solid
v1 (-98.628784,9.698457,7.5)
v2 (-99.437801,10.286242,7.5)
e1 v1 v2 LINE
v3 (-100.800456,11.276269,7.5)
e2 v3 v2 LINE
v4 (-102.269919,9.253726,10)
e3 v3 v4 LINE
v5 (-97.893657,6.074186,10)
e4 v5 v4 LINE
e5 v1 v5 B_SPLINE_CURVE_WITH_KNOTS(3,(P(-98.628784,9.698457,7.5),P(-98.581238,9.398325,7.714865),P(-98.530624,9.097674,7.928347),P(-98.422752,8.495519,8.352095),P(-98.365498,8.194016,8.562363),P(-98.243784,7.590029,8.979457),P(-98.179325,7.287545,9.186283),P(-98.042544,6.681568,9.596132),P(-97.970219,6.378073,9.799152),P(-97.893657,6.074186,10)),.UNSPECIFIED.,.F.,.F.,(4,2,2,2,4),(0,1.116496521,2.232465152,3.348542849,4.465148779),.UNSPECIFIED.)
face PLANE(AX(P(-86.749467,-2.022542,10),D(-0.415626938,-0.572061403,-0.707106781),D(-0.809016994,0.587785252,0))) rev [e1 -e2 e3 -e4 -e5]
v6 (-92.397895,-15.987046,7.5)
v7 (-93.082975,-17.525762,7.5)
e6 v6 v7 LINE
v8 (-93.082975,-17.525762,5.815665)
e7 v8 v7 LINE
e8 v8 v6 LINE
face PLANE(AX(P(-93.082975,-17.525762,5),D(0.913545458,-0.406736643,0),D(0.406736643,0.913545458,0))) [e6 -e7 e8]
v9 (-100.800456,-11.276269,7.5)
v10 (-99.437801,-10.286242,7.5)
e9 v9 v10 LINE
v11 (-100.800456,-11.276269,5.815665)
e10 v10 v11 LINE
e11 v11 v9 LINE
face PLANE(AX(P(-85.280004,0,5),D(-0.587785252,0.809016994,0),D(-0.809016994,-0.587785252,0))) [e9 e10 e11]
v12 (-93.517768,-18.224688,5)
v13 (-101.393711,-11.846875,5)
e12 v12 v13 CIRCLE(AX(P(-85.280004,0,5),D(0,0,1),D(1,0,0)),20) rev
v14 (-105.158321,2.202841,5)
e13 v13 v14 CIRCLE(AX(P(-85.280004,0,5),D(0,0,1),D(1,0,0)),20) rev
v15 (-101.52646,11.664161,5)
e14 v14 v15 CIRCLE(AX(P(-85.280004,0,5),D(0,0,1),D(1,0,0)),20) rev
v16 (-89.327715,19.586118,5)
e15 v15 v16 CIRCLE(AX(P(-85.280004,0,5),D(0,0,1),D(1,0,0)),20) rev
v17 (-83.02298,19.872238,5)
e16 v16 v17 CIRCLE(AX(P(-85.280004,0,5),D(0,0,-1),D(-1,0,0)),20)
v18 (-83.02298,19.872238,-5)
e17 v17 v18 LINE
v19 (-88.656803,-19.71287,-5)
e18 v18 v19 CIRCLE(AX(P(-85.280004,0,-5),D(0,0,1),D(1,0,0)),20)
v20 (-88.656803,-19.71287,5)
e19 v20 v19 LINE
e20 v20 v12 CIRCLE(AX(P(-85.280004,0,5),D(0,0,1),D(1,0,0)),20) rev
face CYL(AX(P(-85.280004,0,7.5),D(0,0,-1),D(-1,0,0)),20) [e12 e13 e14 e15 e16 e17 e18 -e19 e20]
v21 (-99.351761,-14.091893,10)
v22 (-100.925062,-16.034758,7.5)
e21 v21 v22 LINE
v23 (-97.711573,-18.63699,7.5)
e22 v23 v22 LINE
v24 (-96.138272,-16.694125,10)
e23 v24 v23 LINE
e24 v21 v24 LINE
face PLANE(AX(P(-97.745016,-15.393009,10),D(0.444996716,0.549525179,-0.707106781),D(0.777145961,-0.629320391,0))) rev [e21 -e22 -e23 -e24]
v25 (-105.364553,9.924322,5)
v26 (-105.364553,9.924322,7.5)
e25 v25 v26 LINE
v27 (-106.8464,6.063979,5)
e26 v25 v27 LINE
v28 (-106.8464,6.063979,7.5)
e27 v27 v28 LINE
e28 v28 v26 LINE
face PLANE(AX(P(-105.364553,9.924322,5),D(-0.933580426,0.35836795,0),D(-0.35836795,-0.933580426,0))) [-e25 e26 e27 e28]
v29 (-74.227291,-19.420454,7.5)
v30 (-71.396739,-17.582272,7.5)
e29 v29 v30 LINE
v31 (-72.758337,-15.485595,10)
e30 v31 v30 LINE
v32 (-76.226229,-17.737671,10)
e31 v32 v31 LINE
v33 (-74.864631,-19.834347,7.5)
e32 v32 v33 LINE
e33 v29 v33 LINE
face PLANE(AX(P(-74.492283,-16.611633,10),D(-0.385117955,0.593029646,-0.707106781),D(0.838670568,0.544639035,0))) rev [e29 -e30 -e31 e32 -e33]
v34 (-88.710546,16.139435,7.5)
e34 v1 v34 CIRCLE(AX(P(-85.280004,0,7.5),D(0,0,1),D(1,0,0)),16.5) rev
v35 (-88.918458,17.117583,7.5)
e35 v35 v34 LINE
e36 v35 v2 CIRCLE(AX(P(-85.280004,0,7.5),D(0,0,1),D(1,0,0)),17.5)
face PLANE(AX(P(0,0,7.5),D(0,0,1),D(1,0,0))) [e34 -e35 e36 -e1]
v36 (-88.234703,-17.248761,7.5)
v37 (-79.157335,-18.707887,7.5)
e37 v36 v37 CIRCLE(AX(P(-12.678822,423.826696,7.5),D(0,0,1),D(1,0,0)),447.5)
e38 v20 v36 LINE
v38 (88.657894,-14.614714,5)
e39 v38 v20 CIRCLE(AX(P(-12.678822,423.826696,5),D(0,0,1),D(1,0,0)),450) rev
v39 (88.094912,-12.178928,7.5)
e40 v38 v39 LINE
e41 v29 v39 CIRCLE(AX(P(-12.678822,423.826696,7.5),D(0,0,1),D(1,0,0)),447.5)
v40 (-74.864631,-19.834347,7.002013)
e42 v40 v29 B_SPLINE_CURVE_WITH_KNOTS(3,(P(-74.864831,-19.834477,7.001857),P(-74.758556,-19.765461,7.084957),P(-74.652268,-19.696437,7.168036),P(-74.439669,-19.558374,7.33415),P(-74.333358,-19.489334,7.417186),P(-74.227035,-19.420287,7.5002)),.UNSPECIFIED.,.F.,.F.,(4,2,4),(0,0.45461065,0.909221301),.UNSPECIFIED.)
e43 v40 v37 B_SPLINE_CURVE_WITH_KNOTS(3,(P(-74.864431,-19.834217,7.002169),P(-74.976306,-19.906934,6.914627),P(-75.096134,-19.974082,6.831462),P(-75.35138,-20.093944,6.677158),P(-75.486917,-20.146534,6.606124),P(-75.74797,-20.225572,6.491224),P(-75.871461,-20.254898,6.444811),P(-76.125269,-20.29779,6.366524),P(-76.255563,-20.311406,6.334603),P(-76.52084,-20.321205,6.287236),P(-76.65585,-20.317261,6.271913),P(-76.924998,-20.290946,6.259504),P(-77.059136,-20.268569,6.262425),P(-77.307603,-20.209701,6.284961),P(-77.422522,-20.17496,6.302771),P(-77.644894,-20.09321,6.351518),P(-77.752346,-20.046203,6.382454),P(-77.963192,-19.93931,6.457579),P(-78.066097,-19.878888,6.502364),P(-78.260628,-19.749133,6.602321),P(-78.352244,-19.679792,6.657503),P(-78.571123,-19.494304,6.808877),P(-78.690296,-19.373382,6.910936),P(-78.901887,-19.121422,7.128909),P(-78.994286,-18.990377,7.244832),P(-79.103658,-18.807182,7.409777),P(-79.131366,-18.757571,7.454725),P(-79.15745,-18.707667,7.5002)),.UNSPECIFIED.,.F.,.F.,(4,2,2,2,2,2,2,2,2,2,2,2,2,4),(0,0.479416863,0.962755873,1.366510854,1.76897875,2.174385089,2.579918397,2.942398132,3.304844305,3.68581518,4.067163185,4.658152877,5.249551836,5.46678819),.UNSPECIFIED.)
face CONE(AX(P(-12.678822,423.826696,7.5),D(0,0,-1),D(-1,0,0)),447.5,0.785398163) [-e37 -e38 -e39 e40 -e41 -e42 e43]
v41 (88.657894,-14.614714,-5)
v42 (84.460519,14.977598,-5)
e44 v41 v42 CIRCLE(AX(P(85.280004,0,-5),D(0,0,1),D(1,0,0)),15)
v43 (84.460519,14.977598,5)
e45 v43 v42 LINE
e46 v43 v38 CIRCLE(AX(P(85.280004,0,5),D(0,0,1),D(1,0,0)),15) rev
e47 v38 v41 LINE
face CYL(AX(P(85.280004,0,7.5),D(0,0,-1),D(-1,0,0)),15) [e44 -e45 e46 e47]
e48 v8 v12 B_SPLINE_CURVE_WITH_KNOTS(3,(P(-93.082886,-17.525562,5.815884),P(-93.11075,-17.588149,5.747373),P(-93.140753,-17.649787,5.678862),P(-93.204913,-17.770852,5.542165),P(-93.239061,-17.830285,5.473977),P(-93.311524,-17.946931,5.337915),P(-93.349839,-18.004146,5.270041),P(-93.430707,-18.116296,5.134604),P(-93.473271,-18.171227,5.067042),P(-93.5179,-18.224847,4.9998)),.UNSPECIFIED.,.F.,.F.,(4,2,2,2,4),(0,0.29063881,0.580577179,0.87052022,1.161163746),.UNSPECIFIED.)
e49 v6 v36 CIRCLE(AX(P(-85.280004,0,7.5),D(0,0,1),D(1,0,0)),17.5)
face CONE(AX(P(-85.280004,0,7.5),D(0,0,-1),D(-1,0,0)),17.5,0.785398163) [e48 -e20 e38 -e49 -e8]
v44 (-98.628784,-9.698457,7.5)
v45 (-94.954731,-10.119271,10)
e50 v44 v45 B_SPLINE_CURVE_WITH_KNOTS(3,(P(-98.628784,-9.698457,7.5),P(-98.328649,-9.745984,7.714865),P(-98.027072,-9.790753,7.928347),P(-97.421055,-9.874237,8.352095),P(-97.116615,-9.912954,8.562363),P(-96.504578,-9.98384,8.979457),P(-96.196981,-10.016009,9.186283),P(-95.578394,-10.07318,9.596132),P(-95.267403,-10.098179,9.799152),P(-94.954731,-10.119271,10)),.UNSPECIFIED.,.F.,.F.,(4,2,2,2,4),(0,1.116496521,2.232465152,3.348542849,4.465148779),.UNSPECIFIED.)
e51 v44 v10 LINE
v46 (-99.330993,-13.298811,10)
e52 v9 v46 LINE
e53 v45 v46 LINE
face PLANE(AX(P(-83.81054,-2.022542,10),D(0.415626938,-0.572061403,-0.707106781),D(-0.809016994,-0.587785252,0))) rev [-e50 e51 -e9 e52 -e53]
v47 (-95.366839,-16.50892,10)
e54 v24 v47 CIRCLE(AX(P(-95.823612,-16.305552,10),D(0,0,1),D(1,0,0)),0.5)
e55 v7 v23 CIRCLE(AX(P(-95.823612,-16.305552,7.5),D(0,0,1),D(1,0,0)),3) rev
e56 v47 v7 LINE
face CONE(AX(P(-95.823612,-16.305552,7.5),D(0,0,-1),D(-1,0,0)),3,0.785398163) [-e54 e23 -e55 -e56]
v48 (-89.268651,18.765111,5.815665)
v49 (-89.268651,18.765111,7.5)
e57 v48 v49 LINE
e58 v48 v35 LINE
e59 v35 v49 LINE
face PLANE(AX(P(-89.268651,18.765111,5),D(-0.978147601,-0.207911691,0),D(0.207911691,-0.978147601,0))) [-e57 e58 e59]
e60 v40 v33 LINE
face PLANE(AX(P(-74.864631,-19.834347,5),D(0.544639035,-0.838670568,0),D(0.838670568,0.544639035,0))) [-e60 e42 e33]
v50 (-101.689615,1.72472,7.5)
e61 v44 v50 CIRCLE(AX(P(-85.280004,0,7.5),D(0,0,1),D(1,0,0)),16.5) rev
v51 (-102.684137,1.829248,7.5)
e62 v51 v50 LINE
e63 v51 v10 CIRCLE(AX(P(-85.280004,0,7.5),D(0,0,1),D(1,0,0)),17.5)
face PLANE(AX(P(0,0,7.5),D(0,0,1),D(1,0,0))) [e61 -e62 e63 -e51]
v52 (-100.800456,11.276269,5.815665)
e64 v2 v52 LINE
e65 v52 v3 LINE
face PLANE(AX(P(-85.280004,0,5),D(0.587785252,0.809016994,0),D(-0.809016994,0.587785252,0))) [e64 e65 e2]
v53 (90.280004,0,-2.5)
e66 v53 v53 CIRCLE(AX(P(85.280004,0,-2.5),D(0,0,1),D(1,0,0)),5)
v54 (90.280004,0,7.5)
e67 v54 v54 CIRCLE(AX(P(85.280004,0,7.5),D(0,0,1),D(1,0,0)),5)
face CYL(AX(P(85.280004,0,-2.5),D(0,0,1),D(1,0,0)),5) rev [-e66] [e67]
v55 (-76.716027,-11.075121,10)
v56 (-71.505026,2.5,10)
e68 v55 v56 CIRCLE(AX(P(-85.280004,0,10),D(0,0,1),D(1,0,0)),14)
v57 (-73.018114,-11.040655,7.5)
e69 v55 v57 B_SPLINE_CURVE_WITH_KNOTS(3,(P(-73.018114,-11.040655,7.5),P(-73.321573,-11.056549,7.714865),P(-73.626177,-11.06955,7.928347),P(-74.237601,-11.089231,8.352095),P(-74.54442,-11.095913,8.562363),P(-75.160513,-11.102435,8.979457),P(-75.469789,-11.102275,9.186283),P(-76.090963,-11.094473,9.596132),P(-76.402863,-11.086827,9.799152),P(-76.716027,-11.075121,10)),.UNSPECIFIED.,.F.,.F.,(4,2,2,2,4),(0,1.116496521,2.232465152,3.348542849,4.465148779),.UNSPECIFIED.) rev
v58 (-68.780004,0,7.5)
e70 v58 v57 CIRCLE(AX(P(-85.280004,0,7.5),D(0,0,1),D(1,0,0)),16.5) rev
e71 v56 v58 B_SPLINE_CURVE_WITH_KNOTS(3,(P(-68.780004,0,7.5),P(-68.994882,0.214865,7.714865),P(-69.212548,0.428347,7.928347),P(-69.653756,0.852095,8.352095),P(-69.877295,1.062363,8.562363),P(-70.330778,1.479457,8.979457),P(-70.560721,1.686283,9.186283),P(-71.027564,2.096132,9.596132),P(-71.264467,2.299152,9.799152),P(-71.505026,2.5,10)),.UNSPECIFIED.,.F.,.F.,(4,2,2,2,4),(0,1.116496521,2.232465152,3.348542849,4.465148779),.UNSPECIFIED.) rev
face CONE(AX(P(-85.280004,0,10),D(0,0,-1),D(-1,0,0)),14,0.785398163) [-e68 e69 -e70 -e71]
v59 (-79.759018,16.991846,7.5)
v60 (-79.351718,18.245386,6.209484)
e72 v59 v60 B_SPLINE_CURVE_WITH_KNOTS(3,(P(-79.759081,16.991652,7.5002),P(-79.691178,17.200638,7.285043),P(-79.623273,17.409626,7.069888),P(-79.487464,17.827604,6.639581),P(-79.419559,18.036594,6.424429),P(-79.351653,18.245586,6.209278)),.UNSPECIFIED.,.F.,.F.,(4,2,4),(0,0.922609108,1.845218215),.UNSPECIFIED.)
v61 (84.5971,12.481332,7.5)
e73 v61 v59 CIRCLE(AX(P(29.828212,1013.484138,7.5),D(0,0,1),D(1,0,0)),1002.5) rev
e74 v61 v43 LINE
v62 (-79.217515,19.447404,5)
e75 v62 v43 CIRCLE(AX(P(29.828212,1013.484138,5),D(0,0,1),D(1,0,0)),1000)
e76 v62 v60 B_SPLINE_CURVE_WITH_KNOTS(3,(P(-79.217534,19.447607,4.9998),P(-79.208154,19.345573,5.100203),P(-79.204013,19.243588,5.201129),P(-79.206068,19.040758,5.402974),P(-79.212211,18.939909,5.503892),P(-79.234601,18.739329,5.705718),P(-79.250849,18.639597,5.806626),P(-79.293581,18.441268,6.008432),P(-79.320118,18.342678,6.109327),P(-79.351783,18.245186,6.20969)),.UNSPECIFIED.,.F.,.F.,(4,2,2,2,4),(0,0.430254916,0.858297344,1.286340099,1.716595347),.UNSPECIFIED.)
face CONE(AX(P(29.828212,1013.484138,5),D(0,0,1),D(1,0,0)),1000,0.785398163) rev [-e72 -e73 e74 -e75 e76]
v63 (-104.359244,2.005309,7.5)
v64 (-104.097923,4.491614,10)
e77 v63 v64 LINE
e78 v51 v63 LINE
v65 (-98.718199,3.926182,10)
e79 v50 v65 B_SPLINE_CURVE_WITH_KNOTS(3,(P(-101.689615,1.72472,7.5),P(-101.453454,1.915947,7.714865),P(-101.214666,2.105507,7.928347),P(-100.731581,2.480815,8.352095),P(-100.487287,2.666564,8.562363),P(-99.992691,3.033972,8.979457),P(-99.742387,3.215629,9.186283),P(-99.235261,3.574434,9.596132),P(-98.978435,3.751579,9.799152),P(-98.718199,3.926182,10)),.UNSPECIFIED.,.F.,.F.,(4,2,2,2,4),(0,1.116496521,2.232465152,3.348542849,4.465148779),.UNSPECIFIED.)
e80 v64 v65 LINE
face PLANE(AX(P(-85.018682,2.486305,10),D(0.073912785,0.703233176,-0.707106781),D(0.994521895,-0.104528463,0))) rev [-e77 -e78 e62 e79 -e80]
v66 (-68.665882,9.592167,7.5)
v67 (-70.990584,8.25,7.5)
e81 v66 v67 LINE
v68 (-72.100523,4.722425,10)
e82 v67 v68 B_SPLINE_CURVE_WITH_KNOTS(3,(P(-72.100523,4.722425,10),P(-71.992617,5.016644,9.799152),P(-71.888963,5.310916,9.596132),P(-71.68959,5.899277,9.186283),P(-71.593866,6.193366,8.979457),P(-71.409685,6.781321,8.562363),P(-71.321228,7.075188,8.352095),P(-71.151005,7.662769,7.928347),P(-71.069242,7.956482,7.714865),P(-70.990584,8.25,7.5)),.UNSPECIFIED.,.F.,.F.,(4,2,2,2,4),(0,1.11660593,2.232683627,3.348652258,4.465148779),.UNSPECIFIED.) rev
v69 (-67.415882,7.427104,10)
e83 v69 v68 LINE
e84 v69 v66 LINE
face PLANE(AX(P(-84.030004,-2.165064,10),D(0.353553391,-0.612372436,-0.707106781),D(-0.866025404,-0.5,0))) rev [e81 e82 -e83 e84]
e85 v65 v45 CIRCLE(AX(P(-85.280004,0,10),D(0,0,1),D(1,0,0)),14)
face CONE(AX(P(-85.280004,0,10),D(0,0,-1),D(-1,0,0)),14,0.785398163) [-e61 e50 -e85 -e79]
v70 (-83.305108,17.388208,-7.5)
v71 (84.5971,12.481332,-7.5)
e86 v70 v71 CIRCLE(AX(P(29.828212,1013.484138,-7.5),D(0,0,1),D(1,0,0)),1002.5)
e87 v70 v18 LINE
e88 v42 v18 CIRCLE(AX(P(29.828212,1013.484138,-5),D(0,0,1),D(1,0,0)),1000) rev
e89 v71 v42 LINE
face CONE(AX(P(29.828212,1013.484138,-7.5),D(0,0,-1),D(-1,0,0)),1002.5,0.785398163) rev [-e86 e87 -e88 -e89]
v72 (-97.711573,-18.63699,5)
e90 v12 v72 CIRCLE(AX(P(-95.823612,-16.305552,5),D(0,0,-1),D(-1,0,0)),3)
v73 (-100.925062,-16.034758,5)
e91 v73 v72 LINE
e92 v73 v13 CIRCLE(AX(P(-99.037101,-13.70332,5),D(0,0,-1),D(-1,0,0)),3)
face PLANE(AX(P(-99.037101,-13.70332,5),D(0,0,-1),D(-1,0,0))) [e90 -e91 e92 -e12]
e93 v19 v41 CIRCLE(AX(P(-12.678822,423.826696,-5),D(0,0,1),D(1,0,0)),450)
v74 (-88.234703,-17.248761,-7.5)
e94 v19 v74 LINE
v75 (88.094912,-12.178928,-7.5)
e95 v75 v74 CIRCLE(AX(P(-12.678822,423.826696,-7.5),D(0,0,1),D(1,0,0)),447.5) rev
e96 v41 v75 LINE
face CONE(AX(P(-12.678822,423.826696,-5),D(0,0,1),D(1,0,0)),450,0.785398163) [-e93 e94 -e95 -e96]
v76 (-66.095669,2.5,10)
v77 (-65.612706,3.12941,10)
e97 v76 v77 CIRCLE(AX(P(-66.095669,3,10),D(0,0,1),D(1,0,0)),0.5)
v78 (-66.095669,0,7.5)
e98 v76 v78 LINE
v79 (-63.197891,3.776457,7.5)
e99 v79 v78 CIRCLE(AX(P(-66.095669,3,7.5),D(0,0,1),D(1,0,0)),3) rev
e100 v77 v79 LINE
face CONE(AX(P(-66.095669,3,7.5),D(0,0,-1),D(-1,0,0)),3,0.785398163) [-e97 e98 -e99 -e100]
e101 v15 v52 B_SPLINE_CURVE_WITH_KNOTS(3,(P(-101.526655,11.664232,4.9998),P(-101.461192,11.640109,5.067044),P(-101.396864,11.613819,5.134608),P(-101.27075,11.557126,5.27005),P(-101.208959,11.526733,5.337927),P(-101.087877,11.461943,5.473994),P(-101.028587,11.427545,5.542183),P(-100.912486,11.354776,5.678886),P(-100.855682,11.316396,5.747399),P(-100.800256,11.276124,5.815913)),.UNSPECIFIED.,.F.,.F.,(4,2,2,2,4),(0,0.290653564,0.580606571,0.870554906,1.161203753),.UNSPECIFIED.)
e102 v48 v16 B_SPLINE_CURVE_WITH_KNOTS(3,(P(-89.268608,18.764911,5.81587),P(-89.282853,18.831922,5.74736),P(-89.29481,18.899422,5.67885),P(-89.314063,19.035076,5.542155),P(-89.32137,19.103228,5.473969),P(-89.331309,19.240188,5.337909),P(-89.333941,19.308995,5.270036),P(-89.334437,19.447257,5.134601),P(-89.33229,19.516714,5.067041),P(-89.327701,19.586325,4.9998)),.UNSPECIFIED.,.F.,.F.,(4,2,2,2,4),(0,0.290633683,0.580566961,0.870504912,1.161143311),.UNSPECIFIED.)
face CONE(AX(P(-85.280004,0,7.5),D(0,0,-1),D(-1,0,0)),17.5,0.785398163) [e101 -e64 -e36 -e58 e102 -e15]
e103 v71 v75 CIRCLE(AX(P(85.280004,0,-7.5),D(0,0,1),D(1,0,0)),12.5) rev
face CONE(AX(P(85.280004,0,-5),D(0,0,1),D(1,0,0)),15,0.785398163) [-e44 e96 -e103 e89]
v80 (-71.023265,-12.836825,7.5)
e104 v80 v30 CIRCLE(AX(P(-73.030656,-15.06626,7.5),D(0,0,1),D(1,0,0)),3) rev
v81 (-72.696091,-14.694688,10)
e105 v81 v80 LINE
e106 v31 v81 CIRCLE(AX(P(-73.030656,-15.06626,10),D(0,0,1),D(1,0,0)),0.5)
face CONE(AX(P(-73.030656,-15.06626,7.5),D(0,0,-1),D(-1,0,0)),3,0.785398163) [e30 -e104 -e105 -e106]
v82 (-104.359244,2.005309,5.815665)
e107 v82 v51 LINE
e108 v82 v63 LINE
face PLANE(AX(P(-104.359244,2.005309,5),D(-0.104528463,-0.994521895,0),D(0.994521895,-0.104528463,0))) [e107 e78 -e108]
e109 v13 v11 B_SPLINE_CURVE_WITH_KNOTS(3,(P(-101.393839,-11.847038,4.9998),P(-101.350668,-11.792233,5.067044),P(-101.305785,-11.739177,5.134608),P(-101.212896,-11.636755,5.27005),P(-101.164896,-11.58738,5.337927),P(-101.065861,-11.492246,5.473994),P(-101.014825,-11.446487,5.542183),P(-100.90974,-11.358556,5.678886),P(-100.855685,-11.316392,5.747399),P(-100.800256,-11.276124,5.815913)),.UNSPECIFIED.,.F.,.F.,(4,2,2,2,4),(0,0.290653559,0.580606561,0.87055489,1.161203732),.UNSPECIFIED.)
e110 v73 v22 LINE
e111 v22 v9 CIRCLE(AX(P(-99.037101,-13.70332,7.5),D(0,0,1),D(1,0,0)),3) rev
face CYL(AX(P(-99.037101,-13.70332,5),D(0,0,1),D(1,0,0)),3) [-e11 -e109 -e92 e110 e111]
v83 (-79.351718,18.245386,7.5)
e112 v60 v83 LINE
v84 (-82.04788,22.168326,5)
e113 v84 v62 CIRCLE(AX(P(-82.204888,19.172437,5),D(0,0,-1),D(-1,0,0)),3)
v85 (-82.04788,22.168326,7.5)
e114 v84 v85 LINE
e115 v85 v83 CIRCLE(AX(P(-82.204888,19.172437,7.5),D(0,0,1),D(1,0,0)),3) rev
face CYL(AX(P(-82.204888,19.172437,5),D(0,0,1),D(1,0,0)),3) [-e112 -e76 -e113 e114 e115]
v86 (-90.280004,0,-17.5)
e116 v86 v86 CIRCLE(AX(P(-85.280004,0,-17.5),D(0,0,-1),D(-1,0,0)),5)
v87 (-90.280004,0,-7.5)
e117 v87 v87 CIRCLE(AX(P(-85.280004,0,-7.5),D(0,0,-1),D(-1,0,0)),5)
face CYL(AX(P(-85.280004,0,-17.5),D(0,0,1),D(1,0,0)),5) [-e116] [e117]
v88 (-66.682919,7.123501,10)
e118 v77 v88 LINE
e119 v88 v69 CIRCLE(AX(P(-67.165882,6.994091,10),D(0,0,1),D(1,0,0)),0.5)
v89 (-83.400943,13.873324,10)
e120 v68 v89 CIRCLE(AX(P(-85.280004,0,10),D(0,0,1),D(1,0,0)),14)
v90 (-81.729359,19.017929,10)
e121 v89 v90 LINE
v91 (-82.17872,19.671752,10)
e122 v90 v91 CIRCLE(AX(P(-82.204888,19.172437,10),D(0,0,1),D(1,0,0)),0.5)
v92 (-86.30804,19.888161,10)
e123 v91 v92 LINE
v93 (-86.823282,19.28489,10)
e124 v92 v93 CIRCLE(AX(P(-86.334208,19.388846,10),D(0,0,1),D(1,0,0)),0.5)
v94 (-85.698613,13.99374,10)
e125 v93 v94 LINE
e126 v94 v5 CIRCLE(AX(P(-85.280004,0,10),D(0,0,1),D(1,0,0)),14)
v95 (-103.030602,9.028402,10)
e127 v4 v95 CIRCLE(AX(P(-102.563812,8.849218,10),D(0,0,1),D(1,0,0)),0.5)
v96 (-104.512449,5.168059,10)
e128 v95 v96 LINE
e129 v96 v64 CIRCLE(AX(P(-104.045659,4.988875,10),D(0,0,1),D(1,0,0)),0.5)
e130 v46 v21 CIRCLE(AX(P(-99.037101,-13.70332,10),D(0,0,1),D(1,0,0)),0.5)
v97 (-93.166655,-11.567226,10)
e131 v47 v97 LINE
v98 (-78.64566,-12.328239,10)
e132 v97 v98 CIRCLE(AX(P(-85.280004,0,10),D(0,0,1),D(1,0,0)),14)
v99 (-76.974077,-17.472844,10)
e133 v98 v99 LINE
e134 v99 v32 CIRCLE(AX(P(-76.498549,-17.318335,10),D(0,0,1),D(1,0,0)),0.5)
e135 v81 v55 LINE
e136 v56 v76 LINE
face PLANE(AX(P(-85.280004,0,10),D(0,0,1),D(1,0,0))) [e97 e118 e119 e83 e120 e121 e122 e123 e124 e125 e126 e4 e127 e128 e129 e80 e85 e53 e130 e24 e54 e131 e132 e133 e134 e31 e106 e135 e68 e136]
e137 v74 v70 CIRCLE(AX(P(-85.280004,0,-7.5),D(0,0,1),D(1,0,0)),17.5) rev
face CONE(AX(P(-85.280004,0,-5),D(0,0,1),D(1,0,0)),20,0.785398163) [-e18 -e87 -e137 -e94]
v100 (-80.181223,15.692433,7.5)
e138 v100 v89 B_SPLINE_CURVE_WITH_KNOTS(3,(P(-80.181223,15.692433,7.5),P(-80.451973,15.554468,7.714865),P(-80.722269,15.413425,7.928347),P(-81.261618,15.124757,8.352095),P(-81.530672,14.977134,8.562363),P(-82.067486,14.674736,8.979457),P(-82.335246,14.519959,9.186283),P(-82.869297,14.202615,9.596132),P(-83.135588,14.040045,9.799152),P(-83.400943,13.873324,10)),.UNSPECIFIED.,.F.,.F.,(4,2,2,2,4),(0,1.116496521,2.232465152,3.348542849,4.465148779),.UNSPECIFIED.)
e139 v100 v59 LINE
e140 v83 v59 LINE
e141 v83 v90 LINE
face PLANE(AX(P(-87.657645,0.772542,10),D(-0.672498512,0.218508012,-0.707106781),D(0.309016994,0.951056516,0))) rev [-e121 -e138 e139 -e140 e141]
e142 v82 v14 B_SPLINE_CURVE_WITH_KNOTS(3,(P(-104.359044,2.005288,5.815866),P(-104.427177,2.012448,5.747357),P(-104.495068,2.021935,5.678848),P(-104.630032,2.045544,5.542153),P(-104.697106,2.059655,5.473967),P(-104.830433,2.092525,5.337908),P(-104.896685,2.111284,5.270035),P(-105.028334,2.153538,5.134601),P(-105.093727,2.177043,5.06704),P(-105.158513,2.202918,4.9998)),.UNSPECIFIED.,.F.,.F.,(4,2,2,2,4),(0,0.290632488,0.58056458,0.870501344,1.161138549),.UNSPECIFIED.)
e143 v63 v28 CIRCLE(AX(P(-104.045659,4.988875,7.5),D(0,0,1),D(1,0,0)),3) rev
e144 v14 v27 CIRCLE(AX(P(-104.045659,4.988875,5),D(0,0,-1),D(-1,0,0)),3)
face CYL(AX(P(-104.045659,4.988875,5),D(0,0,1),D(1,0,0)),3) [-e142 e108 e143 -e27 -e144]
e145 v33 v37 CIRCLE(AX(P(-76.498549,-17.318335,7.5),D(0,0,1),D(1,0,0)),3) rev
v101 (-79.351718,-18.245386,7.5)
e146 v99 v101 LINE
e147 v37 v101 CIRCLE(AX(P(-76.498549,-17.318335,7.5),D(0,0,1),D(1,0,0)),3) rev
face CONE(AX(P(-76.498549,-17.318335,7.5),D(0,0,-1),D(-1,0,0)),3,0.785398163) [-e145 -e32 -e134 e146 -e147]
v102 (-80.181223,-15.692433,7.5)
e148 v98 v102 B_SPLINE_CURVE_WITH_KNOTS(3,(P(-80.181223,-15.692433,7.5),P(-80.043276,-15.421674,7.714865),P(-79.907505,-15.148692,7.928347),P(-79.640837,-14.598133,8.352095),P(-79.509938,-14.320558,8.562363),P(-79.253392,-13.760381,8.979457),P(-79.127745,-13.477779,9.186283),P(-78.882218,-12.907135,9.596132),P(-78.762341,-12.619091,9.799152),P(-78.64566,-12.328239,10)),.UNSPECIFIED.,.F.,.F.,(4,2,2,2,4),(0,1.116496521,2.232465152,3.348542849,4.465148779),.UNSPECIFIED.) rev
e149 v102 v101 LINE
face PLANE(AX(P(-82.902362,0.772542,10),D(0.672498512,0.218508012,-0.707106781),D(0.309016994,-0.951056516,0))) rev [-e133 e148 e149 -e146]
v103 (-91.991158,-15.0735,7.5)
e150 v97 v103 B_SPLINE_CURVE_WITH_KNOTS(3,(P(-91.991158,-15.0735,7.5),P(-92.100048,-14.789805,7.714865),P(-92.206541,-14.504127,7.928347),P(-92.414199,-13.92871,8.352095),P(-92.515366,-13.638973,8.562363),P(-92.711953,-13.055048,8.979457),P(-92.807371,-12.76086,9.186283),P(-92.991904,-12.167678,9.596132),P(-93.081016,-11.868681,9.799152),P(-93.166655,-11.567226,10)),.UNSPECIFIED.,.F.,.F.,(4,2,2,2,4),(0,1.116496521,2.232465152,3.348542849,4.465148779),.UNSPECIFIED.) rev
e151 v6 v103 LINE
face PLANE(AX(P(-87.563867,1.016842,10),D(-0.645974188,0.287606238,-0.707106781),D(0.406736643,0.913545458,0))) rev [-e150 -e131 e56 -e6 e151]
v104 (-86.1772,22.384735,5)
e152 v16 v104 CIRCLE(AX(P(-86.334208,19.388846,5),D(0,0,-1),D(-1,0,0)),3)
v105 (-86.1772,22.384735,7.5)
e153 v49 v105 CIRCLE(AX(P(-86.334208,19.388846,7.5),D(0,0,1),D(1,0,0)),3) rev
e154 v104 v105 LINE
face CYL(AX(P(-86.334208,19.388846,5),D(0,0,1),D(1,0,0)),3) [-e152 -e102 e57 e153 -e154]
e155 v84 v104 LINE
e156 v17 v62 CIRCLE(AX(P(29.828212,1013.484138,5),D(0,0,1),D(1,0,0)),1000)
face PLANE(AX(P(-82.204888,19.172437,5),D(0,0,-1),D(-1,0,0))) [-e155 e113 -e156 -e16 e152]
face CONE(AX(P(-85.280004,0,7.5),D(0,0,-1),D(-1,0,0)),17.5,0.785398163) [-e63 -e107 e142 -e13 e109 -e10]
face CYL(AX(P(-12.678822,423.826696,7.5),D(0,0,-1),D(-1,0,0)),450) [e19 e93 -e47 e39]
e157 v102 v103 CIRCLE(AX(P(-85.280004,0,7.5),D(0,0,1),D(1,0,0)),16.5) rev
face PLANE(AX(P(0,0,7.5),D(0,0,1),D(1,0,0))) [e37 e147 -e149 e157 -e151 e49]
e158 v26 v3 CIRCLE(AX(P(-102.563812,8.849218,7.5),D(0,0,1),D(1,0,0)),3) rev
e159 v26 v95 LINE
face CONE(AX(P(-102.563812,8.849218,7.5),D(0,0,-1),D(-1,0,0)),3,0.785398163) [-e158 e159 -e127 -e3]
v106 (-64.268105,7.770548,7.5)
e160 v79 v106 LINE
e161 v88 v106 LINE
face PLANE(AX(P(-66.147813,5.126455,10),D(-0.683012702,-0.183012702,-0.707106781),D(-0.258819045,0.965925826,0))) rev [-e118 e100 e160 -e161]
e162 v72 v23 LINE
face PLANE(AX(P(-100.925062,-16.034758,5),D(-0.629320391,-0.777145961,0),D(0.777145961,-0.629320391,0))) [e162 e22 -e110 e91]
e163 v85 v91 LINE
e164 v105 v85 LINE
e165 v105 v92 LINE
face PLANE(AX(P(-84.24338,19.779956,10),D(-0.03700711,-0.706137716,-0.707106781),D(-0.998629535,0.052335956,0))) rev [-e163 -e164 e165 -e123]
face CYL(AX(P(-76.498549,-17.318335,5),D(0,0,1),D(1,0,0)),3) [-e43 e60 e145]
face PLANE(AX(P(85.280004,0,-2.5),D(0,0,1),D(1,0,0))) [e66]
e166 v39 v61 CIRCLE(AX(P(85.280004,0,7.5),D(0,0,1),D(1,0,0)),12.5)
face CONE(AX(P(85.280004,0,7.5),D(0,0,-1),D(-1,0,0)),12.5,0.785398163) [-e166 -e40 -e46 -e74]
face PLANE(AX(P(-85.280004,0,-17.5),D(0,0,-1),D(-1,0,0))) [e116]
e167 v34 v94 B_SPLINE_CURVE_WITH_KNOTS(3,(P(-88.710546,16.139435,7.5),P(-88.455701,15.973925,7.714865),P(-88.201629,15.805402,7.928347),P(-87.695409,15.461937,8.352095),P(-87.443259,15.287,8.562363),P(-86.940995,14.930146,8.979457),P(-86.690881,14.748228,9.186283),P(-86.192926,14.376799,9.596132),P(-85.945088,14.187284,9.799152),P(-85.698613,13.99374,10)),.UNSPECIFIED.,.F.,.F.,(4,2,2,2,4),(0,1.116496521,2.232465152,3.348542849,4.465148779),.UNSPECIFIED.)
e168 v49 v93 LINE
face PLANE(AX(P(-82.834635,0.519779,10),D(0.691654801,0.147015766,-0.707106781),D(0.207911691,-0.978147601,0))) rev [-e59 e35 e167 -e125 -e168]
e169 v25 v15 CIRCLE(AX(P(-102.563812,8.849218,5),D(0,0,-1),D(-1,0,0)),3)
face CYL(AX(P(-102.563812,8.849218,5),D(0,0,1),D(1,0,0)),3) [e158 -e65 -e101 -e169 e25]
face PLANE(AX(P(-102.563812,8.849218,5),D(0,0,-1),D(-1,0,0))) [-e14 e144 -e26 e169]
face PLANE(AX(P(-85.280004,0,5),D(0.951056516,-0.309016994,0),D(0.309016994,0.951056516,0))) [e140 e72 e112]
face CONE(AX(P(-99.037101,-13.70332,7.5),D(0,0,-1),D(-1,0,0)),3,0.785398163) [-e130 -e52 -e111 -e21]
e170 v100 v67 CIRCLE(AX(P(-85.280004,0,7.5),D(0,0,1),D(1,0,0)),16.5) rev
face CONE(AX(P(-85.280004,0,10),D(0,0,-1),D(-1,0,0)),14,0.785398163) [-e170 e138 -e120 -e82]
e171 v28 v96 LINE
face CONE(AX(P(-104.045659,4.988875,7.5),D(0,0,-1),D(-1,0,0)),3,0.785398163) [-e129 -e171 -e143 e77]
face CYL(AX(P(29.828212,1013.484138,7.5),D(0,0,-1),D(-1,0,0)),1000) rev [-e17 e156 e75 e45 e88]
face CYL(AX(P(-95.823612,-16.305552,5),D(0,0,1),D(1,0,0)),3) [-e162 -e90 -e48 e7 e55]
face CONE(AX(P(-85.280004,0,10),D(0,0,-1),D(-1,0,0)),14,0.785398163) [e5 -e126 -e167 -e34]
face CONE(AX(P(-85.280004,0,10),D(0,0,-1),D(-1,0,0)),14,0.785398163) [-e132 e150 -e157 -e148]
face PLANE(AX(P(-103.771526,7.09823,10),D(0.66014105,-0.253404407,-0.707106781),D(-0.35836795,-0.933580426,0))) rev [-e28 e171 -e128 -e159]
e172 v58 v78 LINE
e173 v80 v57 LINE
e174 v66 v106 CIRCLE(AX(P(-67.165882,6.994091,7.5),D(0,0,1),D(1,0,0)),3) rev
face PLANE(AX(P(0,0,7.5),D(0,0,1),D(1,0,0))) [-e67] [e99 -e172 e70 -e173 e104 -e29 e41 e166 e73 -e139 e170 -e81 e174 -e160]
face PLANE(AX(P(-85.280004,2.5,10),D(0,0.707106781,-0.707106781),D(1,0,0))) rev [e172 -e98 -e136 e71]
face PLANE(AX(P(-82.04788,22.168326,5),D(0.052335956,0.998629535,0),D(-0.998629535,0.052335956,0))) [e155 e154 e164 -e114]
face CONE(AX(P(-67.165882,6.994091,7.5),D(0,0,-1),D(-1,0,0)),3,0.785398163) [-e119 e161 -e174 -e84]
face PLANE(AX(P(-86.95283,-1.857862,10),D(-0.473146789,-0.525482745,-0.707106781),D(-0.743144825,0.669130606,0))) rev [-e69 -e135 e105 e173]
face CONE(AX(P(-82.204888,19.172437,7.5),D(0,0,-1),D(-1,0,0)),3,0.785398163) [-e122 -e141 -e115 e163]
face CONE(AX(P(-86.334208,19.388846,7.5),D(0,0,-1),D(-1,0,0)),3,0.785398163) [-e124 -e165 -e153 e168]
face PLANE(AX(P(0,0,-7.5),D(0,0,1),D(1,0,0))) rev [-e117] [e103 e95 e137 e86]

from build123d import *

# Parameters (mm, degrees)
BOSS_EXTRUDE2_DEPTH = 7.5
CHAMFER1_SIZE       = 2.5
SKETCH4_R           = 16.5
BOSS_EXTRUDE3_DEPTH = 2.5
BOSS_EXTRUDE4_DEPTH = 5
CHAMFER2_SIZE       = 2.5
SKETCH6_R           = 5
CUT_EXTRUDE1_DEPTH  = 10
SKETCH7_R           = 5
BOSS_EXTRUDE5_DEPTH = 10


with BuildPart() as part:
    # Sketch1 → Boss-Extrude2 (new, symmetric)
    with BuildSketch(Plane.XY):
        with BuildLine():
            ThreePointArc((84.460518945, 14.977598104), (0.616073919, 13.910903957), (-83.022979725, 19.872238008))
            ThreePointArc((-83.022979725, 19.872238008), (-105.080474764, 2.818038301), (-88.656802688, -19.712869593))
            ThreePointArc((-88.656802688, -19.712869593), (0.254242747, -25.987416271), (88.657894096, -14.614713664))
            ThreePointArc((88.657894096, -14.614713664), (100.131353297, 2.106516275), (84.460518945, 14.977598104))
        make_face()
    extrude(amount=BOSS_EXTRUDE2_DEPTH, both=True)

    # Chamfer1
    chamfer1_edges = [part.edges().sort_by_distance(p)[0] for p in [
        (100.131353297, 2.106516275, 7.5),
        (0.616073919, 13.910903957, 7.5),
        (-105.080474764, 2.818038301, 7.5),
        (0.254242747, -25.987416271, 7.5),
        (-105.080474764, 2.818038301, -7.5),
        (0.616073919, 13.910903957, -7.5),
        (100.131353297, 2.106516275, -7.5),
        (0.254242747, -25.987416271, -7.5),
    ]]
    chamfer(chamfer1_edges, length=CHAMFER1_SIZE)

    # Sketch4 → Boss-Extrude3 (add, symmetric)
    with BuildSketch(Plane.XY.offset(7.5)):
        with Locations((-85.280003554, 0)):
            Circle(SKETCH4_R)
    extrude(amount=BOSS_EXTRUDE3_DEPTH, both=True)

    # Sketch5 → Boss-Extrude4 (add)
    with BuildSketch(Plane.XY.offset(10)):
        with BuildLine():
            Line((-68.665882393, 9.592167325), (-85.280003554, 0))
            Line((-85.280003554, 0), (-66.095668905, 0))
            ThreePointArc((-66.095668905, 0), (-63.715608884, 1.173715713), (-63.197891426, 3.776457135))
            Line((-63.197891426, 3.776457135), (-64.268104914, 7.770548248))
            ThreePointArc((-64.268104914, 7.770548248), (-66.017832096, 9.765729711), (-68.665882393, 9.592167325))
        make_face()
        with BuildLine():
            Line((-71.023264529, -12.836825476), (-85.280003554, 0))
            Line((-85.280003554, 0), (-79.351718121, -18.245386479))
            ThreePointArc((-79.351718121, -18.245386479), (-77.49996915, -20.146259969), (-74.864631467, -19.834347199))
            Line((-74.864631467, -19.834347199), (-71.396739243, -17.582271657))
            ThreePointArc((-71.396739243, -17.582271657), (-70.039904347, -15.30163724), (-71.023264529, -12.836825476))
        make_face()
        with BuildLine():
            Line((-93.082975429, -17.525761777), (-85.280003554, 0))
            Line((-85.280003554, 0), (-100.800456311, -11.276268982))
            ThreePointArc((-100.800456311, -11.276268982), (-102.036072529, -13.62478912), (-100.925061727, -16.034757849))
            Line((-100.925061727, -16.034757849), (-97.711572975, -18.636989732))
            ThreePointArc((-97.711572975, -18.636989732), (-95.12327571, -19.222661609), (-93.082975429, -17.525761777))
        make_face()
        with BuildLine():
            Line((-104.35924441, 2.00530902), (-85.280003554, 0))
            Line((-85.280003554, 0), (-100.800456311, 11.276268982))
            ThreePointArc((-100.800456311, 11.276268982), (-103.415858102, 11.725677203), (-105.364553347, 9.924321847))
            Line((-105.364553347, 9.924321847), (-106.8464003, 6.063978554))
            ThreePointArc((-106.8464003, 6.063978554), (-106.603579514, 3.421379012), (-104.35924441, 2.00530902))
        make_face()
        with BuildLine():
            Line((-89.268651008, 18.765110909), (-85.280003554, 0))
            Line((-85.280003554, 0), (-79.351718121, 18.245386479))
            ThreePointArc((-79.351718121, 18.245386479), (-79.732509104, 20.871656173), (-82.047879802, 22.168326066))
            Line((-82.047879802, 22.168326066), (-86.177200337, 22.384734585))
            ThreePointArc((-86.177200337, 22.384734585), (-88.615426102, 21.337190126), (-89.268651008, 18.765110909))
        make_face()
    extrude(amount=-BOSS_EXTRUDE4_DEPTH)

    # Chamfer2
    chamfer2_edges = [part.edges().sort_by_distance(p)[0] for p in [
        (-69.828233392, 8.921083662, 10),
        (-66.017832096, 9.765729711, 10),
        (-63.73299817, 5.773502692, 10),
        (-63.715608884, 1.173715713, 10),
        (-67.437836229, 0, 10),
        (-69.875926517, -5.913071167, 10),
        (-72.020689231, -11.938740241, 10),
        (-70.039904347, -15.30163724, 10),
        (-73.130685355, -18.708309428, 10),
        (-77.49996915, -20.146259969, 10),
        (-79.766470634, -16.968909499, 10),
        (-86.143546832, -16.477387323, 10),
        (-92.537066797, -16.299630914, 10),
        (-95.12327571, -19.222661609, 10),
        (-99.318317351, -17.33587379, 10),
        (-102.036072529, -13.62478912, 10),
        (-99.714620136, -10.487362822, 10),
        (-101.217779688, -4.270514244, 10),
        (-103.024429619, 1.865014332, 10),
        (-106.603579514, 3.421379012, 10),
        (-106.105476824, 7.994150201, 10),
        (-103.415858102, 11.725677203, 10),
        (-99.714620136, 10.487362822, 10),
        (-94.266547632, 13.838064371, 10),
        (-88.98959873, 17.45227316, 10),
        (-88.615426102, 21.337190126, 10),
        (-84.112540069, 22.276530326, 10),
        (-79.732509104, 20.871656173, 10),
        (-79.766470634, 16.968909499, 10),
        (-74.896217101, 12.822908364, 10),
    ]]
    chamfer(chamfer2_edges, length=CHAMFER2_SIZE - 0.0001)  # a hair under: the kernel refuses the full size

    # Sketch6 → Cut-Extrude1 (cut)
    with BuildSketch(Plane.XY.offset(7.5)):
        with Locations((85.280003554, 0)):
            Circle(SKETCH6_R)
    extrude(amount=-CUT_EXTRUDE1_DEPTH, mode=Mode.SUBTRACT)

    # Sketch7 → Boss-Extrude5 (add)
    with BuildSketch(Plane(origin=(0, 0, -7.5), x_dir=(-1, 0, 0), z_dir=(0, 0, -1))):
        with Locations((85.280003554, 0)):
            Circle(SKETCH7_R)
    extrude(amount=BOSS_EXTRUDE5_DEPTH)


solid = part.part
